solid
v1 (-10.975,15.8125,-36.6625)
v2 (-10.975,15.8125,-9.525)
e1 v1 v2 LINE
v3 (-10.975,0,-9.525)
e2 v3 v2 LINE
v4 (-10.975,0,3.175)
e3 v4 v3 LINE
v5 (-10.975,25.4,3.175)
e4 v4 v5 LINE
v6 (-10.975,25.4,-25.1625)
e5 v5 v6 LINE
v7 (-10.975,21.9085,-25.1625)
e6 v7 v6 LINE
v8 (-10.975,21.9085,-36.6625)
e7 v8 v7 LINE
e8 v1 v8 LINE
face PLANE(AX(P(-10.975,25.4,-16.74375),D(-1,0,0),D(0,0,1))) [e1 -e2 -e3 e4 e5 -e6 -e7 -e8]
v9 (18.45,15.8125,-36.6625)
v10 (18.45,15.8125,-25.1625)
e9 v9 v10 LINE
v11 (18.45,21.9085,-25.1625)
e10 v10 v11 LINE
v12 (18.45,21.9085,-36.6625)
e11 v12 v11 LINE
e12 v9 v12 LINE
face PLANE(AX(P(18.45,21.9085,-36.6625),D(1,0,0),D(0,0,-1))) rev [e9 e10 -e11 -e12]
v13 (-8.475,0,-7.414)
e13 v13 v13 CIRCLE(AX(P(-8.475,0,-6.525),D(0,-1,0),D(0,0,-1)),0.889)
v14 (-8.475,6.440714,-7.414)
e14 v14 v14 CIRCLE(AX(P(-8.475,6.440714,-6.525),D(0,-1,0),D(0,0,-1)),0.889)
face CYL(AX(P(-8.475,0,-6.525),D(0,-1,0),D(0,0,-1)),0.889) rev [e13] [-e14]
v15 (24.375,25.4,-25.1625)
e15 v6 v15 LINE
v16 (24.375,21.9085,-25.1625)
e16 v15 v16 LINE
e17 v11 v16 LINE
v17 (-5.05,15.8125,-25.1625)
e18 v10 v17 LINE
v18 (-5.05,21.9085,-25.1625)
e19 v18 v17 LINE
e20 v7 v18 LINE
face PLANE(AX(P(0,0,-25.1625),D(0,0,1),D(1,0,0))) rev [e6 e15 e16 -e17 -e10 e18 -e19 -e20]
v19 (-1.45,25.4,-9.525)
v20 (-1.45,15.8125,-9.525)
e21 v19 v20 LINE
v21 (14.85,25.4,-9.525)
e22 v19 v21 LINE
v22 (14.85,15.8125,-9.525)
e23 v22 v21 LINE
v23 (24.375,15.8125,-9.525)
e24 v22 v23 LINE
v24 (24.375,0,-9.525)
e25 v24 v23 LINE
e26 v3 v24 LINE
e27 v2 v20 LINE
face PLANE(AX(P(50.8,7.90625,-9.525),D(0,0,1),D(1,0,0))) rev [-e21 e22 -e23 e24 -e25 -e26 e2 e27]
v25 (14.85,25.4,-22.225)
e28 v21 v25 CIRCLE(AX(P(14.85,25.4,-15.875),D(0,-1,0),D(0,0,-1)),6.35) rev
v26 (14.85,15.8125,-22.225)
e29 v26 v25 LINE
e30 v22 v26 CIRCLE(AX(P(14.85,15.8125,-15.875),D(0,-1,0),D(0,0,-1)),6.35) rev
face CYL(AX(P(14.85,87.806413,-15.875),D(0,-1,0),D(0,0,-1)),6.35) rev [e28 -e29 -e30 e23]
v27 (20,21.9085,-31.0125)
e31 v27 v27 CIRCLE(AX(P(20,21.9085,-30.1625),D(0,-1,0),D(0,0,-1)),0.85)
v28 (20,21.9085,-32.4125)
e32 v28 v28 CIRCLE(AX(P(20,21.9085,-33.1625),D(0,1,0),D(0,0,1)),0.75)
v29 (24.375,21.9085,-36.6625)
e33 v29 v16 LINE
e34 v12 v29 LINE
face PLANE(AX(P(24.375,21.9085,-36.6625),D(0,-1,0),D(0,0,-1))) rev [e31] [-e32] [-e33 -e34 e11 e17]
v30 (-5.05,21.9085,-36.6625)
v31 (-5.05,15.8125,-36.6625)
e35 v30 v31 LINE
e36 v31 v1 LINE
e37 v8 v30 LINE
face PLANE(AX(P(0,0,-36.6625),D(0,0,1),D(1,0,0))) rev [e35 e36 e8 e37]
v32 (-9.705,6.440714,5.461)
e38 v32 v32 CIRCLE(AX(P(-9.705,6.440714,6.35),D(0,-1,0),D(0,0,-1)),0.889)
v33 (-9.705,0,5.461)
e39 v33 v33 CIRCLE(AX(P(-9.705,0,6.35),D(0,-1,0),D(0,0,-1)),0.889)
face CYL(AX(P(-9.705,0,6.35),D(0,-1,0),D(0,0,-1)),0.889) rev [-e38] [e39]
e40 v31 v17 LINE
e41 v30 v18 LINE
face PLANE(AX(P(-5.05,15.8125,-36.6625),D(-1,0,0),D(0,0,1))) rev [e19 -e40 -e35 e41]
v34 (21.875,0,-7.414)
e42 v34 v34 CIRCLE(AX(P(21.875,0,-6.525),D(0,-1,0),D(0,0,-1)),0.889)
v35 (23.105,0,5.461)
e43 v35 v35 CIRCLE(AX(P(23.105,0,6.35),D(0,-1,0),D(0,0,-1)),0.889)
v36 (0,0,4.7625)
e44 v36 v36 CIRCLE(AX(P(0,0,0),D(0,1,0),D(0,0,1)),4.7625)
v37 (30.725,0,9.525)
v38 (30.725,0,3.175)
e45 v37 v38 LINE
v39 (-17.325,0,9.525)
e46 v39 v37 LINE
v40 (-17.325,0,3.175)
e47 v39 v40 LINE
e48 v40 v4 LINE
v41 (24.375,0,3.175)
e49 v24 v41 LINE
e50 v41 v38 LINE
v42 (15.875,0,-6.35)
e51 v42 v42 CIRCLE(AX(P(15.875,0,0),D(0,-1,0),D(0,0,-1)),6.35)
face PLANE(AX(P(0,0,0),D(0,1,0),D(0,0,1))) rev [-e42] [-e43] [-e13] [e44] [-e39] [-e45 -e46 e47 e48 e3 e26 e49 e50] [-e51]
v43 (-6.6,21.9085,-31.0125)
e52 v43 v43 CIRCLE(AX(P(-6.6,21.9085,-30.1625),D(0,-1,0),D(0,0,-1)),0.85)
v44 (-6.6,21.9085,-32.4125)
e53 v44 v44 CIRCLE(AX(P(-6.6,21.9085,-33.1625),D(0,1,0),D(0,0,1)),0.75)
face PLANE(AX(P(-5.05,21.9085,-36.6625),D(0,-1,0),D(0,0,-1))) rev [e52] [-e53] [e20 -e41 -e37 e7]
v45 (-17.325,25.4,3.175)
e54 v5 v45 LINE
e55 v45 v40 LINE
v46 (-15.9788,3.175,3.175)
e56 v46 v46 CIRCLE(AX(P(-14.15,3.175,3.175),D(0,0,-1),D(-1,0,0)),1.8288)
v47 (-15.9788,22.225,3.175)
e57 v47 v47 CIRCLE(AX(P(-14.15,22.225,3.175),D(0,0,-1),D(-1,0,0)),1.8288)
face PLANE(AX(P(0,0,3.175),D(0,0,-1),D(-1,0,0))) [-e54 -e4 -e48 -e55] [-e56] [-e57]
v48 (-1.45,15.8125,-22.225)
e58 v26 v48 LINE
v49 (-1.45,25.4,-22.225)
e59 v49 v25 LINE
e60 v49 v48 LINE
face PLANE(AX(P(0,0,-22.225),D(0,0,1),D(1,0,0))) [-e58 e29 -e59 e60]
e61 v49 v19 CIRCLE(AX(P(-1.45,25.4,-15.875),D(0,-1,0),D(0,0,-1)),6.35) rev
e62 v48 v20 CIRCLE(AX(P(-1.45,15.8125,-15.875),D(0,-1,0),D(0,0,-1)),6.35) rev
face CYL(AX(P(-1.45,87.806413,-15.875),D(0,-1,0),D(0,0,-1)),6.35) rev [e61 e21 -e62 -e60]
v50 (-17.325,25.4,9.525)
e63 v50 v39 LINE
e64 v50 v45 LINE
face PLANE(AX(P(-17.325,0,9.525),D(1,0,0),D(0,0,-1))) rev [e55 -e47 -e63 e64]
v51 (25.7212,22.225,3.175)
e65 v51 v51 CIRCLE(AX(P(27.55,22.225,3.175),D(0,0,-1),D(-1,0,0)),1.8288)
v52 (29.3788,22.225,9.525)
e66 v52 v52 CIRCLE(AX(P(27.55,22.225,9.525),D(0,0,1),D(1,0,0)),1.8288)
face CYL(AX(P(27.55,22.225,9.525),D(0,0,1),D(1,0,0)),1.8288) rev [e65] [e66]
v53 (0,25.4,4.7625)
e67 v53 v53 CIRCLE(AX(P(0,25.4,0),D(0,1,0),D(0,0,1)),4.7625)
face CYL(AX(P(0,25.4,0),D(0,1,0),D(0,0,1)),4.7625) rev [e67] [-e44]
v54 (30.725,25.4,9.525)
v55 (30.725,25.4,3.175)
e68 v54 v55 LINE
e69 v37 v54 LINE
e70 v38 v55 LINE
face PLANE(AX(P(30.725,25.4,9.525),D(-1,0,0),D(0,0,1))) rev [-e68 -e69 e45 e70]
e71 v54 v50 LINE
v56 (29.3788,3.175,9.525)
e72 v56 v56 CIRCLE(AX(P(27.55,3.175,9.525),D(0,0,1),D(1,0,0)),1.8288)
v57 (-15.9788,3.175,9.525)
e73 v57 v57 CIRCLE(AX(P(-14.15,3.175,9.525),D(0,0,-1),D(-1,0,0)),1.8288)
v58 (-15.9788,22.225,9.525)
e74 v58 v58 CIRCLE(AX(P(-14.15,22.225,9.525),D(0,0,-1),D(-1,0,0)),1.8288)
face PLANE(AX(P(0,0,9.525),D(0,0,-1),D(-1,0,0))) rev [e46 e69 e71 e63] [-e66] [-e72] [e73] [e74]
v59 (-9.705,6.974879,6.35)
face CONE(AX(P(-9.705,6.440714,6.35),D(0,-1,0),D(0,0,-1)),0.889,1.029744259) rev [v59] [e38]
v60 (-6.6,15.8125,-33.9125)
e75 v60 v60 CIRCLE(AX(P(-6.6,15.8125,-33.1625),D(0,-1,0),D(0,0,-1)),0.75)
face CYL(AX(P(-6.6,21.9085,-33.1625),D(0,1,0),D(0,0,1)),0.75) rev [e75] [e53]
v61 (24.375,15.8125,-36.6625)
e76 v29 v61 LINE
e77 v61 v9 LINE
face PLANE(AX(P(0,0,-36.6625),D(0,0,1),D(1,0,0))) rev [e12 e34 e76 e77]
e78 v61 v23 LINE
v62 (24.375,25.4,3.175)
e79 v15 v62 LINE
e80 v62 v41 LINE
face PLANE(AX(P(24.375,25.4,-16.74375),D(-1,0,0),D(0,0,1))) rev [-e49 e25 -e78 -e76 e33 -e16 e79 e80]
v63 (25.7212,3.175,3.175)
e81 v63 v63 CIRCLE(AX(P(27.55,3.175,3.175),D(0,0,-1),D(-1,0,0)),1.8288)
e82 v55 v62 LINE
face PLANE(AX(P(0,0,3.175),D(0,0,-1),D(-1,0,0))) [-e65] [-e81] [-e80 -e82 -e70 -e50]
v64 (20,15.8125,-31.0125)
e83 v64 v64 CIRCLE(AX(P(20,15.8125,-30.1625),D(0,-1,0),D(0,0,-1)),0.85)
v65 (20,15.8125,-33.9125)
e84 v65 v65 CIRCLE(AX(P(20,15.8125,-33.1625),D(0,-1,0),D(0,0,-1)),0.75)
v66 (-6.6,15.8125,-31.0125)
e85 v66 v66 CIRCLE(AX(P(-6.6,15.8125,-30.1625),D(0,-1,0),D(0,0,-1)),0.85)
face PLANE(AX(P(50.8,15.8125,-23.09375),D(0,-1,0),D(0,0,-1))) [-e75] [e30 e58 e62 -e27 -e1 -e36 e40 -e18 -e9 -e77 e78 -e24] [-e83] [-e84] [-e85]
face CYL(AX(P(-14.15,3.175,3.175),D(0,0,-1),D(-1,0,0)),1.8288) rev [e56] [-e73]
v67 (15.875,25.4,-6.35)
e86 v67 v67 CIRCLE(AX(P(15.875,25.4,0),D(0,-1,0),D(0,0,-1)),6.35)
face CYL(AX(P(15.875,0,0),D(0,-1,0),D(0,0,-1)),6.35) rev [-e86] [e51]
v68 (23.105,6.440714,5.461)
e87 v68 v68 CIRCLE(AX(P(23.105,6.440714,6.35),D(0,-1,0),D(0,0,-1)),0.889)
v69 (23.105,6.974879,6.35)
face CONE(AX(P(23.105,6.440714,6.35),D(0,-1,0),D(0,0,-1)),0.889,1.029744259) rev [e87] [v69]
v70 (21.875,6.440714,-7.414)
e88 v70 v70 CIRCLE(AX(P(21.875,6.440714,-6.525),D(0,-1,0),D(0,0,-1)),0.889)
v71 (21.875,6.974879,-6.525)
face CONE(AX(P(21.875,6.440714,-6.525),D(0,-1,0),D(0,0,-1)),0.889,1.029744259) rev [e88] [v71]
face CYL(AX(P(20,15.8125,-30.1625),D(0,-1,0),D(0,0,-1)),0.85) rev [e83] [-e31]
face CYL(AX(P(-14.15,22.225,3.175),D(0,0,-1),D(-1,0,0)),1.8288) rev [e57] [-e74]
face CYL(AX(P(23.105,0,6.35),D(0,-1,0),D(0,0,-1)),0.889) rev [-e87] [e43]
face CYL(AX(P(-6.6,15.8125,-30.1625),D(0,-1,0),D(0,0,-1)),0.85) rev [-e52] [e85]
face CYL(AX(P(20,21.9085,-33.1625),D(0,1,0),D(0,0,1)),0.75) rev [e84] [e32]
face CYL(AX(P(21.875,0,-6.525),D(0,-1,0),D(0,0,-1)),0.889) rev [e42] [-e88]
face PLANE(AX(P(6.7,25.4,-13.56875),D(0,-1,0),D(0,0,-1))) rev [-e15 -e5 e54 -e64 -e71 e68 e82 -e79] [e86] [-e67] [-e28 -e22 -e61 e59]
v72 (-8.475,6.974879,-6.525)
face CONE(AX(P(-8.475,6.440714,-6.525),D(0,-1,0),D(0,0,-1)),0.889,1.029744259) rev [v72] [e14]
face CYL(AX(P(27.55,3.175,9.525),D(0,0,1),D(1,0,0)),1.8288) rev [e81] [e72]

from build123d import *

# Parameters (mm, degrees)
EXTRUDE_START               = 15.8125
EXTRUDE_1_OUTLINE_W         = 35.35
EXTRUDE_1_OUTLINE_H         = 28.3375
EXTRUDE_1_DEPTH             = 9.5875
SKETCH_2_W                  = 35.35
SKETCH_2_H                  = 12.7
EXTRUDE_2_DEPTH             = 15.8125
SKETCH_3_W                  = 48.05
SKETCH_3_H                  = 25.4
EXTRUDE_3_DEPTH             = 6.35
SKETCH_4_W                  = 5.925
SKETCH_4_H                  = 6.096
EXTRUDE_4_DEPTH             = 11.5
SKETCH_5_W                  = 5.925
SKETCH_5_H                  = 6.096
EXTRUDE_5_DEPTH             = 11.5
HOLE_WIZARD_1_D             = 3.6576
HOLE_WIZARD_1_DEPTH         = 46.1875
HOLE_WIZARD_2_D             = 3.6576
HOLE_WIZARD_M8_1_D          = 9.525
HOLE_WIZARD_3_D             = 12.7
HOLE_WIZARD_M1_6_1_D        = 1.778
HOLE_WIZARD_M1_6_1_DEPTH    = 6.440714286
HOLE_WIZARD_M1_6_1_TIP      = 0.53416509
HOLE_WIZARD_1_7_1_7_1_D     = 1.7
HOLE_WIZARD_1_7_1_7_1_DEPTH = 9.5875
HOLE_WIZARD_1_5_1_5_1_D     = 1.5
HOLE_WIZARD_1_5_1_5_1_DEPTH = 21.9085


with BuildPart() as part:
    # 凸台-拉伸1: read off the stored shape, not the designer's step
    # 凸台-拉伸1 outline → 凸台-拉伸1 (new body)
    with BuildSketch(Plane(origin=(0, 0, 0), x_dir=(1, 0, 0), z_dir=(0, 1, 0)).offset(EXTRUDE_START)):
        with Locations((6.7, 10.99375)):
            Rectangle(EXTRUDE_1_OUTLINE_W, EXTRUDE_1_OUTLINE_H)
        with BuildLine():
            Line((14.85, 9.525), (-1.45, 9.525))
            ThreePointArc((-1.45, 9.525), (-7.8, 15.875), (-1.45, 22.225))
            Line((-1.45, 22.225), (14.85, 22.225))
            ThreePointArc((14.85, 22.225), (21.2, 15.875), (14.85, 9.525))
        make_face(mode=Mode.SUBTRACT)
    extrude(amount=EXTRUDE_1_DEPTH)

    # 草图2 → 凸台-拉伸2 (add)
    with BuildSketch(Plane.XZ.offset(-15.8125)):
        with Locations((6.7, -3.175)):
            Rectangle(SKETCH_2_W, SKETCH_2_H)
    extrude(amount=EXTRUDE_2_DEPTH)

    # 草图3 → 凸台-拉伸3 (add)
    with BuildSketch(Plane.XY.offset(3.175)):
        with Locations((6.7, 12.7)):
            Rectangle(SKETCH_3_W, SKETCH_3_H)
    extrude(amount=EXTRUDE_3_DEPTH)

    # 草图4 → 凸台-拉伸4 (add)
    with BuildSketch(Plane(origin=(0, 0, -25.1625), x_dir=(-1, 0, 0), z_dir=(0, 0, -1))):
        with Locations((-21.4125, 18.8605)):
            Rectangle(SKETCH_4_W, SKETCH_4_H)
    extrude(amount=EXTRUDE_4_DEPTH)

    # 草图5 → 凸台-拉伸5 (add)
    with BuildSketch(Plane(origin=(0, 0, -25.1625), x_dir=(-1, 0, 0), z_dir=(0, 0, -1))):
        with Locations((8.0125, 18.8605)):
            Rectangle(SKETCH_5_W, SKETCH_5_H)
    extrude(amount=EXTRUDE_5_DEPTH)

    # 孔1
    with Locations(Plane.XY.offset(9.525)):
        with Locations((27.55, 22.225), (27.55, 3.175)):
            Hole(HOLE_WIZARD_1_D / 2, depth=HOLE_WIZARD_1_DEPTH)

    # 孔2 (through all)
    with Locations(Plane(origin=(0, 0, 3.175), x_dir=(-1, 0, 0), z_dir=(0, 0, -1))):
        with Locations((14.15, 3.175), (14.15, 22.225)):
            Hole(HOLE_WIZARD_2_D / 2)

    # M8 间隙孔1 (through all)
    with Locations(Plane(origin=(0, 25.4, 0), x_dir=(1, 0, 0), z_dir=(0, 1, 0))):
        with Locations((0, 0)):
            Hole(HOLE_WIZARD_M8_1_D / 2)

    # 孔3 (through all)
    with Locations(Plane(origin=(0, 0, 0), x_dir=(-1, 0, 0), z_dir=(0, -1, 0))):
        with Locations((-15.875, 0)):
            Hole(HOLE_WIZARD_3_D / 2)

    # M1.6 间隙孔1
    with Locations(Plane(origin=(0, 0, 0), x_dir=(-1, 0, 0), z_dir=(0, -1, 0))):
        with Locations((9.705, -6.35), (8.475, 6.525), (-21.875, 6.525), (-23.105, -6.35)):
            Hole(HOLE_WIZARD_M1_6_1_D / 2, depth=HOLE_WIZARD_M1_6_1_DEPTH)
            with Locations((0, 0, -(HOLE_WIZARD_M1_6_1_DEPTH + HOLE_WIZARD_M1_6_1_TIP / 2))):  # 118° drill point
                Cone(0, HOLE_WIZARD_M1_6_1_D / 2, HOLE_WIZARD_M1_6_1_TIP, mode=Mode.SUBTRACT)

    # Ø1.7 (1.7) 直径孔1
    with Locations(Plane(origin=(0, 15.8125, 0), x_dir=(-1, 0, 0), z_dir=(0, -1, 0))):
        with Locations((-20, 30.1625), (6.6, 30.1625)):
            Hole(HOLE_WIZARD_1_7_1_7_1_D / 2, depth=HOLE_WIZARD_1_7_1_7_1_DEPTH)

    # Ø1.5 (1.5) 直径孔1
    with Locations(Plane(origin=(0, 21.9085, 0), x_dir=(1, 0, 0), z_dir=(0, 1, 0))):
        with Locations((20, 33.1625), (-6.6, 33.1625)):
            Hole(HOLE_WIZARD_1_5_1_5_1_D / 2, depth=HOLE_WIZARD_1_5_1_5_1_DEPTH)


solid = part.part
